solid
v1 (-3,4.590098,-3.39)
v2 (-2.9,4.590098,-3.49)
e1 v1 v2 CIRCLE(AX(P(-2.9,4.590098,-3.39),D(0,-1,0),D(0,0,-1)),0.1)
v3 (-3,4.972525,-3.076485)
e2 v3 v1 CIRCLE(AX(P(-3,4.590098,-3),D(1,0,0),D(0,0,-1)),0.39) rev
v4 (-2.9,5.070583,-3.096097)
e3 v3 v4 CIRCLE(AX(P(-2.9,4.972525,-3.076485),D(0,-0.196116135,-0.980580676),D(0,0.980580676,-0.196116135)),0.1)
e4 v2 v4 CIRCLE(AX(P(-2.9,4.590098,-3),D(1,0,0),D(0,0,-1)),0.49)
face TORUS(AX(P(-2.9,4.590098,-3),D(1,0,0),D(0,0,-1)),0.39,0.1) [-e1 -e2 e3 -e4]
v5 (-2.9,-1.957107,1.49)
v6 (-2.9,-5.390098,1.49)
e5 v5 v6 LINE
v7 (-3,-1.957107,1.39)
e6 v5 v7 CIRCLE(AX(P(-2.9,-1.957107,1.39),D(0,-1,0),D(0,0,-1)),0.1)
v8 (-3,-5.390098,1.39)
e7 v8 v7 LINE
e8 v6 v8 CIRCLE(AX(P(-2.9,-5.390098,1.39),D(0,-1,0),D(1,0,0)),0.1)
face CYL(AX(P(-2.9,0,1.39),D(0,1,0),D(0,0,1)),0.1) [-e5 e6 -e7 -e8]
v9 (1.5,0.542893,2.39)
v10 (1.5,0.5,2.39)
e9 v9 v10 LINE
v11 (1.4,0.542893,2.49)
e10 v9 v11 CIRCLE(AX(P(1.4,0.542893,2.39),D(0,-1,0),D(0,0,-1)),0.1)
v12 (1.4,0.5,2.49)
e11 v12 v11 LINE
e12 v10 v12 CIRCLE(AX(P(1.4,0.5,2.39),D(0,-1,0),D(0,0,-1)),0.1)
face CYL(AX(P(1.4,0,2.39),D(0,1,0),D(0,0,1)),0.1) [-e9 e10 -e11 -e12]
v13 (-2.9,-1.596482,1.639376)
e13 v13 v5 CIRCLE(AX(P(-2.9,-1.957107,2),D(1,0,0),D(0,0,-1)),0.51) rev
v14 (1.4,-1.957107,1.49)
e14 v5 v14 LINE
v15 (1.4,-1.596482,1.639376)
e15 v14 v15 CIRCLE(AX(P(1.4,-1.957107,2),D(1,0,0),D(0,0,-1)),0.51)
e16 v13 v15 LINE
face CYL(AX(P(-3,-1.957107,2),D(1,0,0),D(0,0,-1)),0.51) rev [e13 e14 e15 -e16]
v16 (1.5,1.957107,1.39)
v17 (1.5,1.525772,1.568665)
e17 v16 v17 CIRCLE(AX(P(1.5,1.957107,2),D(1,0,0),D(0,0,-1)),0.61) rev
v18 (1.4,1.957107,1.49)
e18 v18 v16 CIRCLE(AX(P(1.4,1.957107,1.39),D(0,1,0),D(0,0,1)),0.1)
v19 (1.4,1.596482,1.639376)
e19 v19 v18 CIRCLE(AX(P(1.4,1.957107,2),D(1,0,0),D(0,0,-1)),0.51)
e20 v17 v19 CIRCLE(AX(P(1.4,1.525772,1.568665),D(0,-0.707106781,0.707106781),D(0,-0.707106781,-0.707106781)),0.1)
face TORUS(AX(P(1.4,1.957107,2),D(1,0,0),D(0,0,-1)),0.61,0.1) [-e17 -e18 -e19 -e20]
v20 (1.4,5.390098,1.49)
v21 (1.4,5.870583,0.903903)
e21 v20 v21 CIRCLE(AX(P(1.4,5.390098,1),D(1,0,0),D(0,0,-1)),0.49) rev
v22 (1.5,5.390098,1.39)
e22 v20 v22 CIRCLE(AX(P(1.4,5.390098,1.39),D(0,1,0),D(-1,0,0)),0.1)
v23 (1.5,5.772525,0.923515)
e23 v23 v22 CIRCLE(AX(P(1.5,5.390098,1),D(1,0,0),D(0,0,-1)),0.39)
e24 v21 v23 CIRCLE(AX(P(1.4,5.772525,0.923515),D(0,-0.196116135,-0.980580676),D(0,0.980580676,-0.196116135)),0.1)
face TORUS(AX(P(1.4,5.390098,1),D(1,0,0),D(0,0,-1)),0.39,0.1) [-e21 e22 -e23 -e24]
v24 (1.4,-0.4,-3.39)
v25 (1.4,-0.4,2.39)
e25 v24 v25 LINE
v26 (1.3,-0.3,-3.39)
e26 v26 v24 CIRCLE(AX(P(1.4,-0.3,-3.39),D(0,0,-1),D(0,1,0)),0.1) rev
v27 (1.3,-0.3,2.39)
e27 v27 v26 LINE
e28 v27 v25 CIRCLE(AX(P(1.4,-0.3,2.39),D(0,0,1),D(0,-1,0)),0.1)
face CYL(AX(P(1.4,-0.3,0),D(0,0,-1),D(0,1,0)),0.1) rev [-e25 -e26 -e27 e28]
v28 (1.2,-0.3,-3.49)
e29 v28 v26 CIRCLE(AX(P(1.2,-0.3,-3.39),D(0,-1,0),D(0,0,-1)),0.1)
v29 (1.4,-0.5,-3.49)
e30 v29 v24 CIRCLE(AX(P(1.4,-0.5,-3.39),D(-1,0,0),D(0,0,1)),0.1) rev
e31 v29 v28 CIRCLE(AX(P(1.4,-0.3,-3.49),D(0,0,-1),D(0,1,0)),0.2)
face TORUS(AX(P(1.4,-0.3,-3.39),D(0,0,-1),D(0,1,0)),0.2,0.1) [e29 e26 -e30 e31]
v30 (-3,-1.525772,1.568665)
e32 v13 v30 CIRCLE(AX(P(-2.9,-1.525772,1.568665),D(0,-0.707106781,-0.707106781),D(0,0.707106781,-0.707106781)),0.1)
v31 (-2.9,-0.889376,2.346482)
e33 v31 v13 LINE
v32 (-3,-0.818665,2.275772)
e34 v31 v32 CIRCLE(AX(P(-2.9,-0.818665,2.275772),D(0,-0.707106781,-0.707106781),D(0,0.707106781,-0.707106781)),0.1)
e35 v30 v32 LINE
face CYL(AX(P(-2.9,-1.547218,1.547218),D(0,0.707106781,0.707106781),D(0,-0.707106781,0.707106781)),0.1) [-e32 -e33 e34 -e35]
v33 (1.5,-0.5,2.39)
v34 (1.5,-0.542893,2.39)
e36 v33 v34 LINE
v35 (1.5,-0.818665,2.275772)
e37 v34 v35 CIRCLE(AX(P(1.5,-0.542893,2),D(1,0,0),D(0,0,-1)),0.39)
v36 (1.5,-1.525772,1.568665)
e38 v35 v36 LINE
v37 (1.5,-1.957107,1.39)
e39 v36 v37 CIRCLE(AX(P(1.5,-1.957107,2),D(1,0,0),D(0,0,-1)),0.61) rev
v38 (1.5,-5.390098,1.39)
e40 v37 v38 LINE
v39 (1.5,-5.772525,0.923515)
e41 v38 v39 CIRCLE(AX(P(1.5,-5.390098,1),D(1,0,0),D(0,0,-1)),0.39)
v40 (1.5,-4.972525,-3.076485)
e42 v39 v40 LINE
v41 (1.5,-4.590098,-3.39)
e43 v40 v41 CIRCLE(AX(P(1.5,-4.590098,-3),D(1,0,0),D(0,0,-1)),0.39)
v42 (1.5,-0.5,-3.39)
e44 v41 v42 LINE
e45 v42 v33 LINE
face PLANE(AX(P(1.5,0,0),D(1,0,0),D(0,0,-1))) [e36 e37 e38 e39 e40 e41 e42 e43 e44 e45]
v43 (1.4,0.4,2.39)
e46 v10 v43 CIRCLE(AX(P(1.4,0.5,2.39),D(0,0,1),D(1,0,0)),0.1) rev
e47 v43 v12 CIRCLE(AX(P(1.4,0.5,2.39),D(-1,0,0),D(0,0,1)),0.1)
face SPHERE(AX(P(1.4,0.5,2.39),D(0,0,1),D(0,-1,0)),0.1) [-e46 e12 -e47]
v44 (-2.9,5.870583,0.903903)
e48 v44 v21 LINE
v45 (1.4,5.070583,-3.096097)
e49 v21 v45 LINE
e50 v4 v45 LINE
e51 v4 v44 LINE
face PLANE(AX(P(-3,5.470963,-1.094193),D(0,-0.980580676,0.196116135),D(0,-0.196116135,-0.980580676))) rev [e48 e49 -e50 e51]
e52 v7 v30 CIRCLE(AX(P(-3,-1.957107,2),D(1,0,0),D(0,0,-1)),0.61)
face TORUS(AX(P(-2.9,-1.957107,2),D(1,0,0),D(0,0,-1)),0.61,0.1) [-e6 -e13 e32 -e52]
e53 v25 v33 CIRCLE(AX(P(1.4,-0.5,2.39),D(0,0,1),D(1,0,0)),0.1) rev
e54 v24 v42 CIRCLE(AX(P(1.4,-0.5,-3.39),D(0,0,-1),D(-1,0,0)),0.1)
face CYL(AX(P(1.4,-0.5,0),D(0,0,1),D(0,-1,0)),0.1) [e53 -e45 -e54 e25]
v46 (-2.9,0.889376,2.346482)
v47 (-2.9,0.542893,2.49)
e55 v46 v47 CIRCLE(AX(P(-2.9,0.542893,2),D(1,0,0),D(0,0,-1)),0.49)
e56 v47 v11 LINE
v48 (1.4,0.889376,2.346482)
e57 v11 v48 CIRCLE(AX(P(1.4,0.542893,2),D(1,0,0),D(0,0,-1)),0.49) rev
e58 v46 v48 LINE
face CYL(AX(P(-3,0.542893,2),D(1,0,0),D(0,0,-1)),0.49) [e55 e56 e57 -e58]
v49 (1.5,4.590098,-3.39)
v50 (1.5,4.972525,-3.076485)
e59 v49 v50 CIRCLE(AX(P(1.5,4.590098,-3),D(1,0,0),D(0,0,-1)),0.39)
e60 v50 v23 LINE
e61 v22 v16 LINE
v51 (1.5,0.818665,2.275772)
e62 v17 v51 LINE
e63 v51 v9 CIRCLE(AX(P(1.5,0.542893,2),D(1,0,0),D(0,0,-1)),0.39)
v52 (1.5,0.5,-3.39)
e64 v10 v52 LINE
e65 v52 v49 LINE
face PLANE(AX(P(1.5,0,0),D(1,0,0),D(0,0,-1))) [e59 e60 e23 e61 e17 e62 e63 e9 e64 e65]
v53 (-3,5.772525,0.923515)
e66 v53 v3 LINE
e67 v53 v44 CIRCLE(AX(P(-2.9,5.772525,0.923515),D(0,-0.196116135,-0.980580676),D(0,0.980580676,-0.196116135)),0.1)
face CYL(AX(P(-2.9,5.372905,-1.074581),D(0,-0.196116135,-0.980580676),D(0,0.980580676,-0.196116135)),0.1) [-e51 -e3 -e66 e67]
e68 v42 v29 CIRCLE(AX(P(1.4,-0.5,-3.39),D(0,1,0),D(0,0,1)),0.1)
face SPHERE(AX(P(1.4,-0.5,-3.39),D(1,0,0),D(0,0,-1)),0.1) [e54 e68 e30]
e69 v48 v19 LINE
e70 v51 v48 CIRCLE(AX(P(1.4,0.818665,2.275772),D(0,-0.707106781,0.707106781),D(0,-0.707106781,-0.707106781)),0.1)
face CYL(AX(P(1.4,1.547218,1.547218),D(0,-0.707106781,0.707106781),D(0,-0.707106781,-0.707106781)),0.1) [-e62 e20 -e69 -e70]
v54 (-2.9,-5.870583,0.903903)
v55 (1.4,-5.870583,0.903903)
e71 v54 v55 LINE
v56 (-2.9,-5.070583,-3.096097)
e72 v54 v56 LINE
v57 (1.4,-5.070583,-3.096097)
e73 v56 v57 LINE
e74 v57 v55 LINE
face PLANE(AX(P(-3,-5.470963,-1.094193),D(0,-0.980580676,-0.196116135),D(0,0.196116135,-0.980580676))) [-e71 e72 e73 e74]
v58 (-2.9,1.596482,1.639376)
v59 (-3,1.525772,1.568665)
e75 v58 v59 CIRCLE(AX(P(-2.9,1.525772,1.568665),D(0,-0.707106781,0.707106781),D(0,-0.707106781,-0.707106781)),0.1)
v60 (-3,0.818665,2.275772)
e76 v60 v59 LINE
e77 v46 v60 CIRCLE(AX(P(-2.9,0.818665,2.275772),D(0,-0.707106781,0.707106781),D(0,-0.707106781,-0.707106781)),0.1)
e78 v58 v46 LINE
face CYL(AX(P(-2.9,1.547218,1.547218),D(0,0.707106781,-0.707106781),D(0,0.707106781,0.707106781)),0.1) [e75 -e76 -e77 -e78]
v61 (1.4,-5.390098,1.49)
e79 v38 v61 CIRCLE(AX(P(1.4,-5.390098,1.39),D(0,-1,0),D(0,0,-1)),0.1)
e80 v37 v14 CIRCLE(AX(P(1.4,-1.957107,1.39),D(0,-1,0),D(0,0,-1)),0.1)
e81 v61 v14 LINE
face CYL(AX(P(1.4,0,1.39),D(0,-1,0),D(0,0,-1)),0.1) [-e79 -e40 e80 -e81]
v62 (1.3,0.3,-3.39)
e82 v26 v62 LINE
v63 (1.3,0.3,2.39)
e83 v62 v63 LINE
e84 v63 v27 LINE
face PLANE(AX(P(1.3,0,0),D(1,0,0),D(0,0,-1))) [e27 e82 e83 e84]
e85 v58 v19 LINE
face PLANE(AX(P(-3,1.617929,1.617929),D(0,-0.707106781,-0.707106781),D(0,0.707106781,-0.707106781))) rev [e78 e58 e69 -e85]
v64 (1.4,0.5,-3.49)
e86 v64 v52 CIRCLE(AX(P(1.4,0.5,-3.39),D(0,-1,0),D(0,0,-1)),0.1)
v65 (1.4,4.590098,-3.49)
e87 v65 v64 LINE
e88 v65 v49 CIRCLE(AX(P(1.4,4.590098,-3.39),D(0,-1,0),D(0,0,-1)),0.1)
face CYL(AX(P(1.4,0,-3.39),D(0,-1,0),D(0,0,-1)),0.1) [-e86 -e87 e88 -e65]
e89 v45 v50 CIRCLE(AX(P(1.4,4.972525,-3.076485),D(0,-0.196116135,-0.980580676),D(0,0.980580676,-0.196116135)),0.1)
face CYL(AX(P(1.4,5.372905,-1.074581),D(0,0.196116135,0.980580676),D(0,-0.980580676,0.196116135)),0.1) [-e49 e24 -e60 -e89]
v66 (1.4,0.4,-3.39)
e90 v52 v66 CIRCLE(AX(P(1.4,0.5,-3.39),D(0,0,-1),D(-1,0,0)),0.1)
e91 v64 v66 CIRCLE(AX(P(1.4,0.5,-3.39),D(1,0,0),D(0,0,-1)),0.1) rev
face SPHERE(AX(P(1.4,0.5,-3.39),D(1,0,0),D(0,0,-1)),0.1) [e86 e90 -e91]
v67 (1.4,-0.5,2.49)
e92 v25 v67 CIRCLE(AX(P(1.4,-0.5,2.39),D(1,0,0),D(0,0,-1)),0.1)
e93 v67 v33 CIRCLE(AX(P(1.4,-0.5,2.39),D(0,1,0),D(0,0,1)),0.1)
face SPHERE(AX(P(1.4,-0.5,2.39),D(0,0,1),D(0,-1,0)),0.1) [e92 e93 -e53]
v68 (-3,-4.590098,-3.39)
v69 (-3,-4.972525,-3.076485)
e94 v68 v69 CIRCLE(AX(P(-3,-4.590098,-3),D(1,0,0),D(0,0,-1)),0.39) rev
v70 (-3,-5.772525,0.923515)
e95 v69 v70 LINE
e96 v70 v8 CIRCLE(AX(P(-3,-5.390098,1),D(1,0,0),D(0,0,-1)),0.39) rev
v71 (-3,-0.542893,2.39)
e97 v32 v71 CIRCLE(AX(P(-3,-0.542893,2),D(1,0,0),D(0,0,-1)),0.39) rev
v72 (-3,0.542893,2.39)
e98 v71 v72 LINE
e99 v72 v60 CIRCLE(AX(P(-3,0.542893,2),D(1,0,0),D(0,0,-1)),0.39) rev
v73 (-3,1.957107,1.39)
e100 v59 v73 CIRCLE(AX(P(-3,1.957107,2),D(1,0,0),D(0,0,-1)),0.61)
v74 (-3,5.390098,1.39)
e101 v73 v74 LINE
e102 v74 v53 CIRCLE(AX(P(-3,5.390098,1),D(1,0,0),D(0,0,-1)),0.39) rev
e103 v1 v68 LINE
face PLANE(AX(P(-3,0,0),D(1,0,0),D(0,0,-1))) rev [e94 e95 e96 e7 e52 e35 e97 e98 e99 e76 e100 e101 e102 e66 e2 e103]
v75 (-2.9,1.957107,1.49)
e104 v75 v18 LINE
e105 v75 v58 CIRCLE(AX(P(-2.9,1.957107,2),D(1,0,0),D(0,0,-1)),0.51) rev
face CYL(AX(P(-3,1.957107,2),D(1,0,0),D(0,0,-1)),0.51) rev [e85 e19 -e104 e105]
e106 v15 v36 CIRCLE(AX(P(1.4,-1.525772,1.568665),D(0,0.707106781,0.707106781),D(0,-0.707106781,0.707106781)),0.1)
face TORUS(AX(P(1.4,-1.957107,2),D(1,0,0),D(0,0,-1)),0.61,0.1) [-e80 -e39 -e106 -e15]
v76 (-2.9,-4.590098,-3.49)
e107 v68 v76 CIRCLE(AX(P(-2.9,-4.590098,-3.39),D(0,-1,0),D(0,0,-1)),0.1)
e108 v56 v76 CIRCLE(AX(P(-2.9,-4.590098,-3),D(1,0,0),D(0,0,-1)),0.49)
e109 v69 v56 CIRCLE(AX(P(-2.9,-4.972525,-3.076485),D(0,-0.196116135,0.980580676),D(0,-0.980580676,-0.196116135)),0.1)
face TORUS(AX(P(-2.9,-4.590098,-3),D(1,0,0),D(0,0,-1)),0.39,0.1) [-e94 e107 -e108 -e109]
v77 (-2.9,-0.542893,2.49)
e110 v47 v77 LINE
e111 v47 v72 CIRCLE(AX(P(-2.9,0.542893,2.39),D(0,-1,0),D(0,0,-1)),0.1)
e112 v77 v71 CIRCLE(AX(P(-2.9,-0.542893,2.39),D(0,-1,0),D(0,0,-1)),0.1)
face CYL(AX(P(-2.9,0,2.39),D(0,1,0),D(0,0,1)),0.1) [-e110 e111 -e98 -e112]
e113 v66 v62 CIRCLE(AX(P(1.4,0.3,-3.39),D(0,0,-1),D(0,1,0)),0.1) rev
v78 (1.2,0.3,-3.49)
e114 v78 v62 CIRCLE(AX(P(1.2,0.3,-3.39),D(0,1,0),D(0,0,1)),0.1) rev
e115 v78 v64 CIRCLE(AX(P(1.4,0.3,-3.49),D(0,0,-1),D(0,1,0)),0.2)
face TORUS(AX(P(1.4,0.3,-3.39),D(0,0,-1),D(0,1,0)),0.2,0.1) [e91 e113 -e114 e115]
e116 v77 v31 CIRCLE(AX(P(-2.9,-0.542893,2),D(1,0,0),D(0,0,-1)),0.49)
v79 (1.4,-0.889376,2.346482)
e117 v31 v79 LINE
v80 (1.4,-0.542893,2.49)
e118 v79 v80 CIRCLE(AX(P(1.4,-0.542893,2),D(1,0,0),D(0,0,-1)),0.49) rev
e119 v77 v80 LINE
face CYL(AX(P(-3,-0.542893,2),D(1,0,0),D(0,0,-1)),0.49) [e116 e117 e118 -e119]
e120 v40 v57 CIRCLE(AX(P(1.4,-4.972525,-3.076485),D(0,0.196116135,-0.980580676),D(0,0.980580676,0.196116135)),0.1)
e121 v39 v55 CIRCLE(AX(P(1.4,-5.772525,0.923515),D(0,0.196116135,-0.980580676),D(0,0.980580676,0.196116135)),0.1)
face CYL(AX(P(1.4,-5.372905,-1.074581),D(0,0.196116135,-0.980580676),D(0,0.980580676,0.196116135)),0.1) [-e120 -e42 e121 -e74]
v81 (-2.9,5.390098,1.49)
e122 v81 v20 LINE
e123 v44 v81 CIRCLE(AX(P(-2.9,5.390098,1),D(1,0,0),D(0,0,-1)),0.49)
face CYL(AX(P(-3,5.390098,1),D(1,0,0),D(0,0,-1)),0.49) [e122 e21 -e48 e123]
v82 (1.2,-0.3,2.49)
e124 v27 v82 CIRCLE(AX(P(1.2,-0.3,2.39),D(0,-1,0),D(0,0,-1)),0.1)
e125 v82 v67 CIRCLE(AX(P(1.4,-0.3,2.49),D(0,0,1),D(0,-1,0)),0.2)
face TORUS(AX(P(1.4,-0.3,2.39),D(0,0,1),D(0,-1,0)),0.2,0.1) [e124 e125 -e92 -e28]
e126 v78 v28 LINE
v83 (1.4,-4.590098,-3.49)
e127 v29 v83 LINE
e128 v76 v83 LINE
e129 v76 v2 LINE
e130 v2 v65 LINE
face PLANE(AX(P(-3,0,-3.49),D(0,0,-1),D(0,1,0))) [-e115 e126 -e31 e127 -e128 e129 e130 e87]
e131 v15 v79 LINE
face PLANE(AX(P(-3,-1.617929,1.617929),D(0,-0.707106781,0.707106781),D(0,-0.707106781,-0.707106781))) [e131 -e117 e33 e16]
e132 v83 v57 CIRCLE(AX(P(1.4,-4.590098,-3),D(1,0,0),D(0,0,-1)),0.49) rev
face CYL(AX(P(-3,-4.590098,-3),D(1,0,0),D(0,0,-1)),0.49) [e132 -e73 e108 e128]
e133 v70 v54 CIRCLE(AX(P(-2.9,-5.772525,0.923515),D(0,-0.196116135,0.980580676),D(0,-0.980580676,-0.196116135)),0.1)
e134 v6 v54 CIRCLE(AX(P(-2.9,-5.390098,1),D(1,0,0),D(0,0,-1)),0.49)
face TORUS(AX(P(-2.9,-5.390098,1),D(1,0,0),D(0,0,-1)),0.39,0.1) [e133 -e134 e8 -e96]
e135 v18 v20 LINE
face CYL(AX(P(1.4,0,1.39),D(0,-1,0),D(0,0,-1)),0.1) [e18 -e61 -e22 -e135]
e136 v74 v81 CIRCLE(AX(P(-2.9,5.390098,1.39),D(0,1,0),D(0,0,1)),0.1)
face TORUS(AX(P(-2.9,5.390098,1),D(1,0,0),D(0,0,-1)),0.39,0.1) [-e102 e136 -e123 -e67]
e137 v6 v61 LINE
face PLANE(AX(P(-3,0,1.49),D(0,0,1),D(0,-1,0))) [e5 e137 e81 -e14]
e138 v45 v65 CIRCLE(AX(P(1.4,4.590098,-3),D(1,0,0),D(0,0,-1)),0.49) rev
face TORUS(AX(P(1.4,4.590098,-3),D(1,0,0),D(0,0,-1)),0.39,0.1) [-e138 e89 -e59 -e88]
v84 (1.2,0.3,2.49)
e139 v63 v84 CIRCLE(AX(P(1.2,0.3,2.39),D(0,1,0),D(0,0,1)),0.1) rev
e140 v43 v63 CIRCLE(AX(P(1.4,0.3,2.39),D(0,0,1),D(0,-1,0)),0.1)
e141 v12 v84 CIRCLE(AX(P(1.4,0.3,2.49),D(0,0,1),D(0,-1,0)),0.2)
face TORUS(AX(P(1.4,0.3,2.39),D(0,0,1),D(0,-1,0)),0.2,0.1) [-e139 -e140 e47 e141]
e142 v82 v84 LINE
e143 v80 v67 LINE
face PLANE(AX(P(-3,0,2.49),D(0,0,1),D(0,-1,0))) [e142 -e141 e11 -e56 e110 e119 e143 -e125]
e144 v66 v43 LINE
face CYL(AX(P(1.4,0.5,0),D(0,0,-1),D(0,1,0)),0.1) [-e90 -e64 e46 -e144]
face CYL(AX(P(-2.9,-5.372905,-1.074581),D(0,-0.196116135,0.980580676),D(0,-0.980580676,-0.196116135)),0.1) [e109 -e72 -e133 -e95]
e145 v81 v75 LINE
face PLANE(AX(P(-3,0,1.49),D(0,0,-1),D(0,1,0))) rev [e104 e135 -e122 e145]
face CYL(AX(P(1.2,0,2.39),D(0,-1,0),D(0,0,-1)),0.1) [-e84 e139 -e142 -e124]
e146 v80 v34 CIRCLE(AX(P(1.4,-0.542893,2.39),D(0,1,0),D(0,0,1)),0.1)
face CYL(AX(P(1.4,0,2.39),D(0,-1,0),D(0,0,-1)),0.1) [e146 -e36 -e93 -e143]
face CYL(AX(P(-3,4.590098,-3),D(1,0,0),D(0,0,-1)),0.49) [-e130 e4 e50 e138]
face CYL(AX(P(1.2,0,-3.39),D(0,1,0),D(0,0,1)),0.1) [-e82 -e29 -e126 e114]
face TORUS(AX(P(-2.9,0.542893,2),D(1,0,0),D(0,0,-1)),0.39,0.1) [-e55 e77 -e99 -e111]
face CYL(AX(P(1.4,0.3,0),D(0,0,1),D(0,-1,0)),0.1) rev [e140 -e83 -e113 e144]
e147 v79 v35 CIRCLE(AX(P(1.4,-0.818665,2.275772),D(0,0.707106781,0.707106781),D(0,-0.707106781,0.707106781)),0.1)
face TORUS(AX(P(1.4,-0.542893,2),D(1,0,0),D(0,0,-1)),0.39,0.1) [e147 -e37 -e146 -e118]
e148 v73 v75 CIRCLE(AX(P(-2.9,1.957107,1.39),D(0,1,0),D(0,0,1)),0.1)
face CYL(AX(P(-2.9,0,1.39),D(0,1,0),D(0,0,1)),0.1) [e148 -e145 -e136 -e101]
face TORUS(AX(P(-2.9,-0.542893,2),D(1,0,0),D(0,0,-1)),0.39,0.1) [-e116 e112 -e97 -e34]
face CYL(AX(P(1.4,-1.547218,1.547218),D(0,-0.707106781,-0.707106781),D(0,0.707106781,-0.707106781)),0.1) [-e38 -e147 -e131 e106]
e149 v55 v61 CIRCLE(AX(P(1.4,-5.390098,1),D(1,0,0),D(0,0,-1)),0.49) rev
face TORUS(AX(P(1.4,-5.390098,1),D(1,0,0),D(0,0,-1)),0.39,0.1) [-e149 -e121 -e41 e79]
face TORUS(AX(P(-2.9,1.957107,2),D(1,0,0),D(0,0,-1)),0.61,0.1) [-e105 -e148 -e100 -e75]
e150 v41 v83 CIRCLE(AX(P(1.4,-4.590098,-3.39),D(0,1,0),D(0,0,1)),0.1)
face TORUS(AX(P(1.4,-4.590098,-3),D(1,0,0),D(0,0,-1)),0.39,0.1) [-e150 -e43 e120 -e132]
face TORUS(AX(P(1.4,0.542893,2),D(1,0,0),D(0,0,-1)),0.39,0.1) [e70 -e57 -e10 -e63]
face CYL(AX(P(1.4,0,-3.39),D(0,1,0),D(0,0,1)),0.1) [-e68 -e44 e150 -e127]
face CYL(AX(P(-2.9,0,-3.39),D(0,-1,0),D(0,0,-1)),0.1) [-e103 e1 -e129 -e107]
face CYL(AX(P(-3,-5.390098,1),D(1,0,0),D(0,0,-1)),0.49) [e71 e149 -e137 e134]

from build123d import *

# Parameters (mm, degrees)
BOSS_EXTRUDE2_START      = -3
BOSS_EXTRUDE2_DEPTH      = 4.5
BOSS_EXTRUDE3_DEPTH      = 1.3
BOSS_EXTRUDE3_DEPTH_BACK = 3
SKETCH2_3_W              = 0.8
SKETCH2_3_H              = 5.98
FILLET1_R                = 0.1


with BuildPart() as part:
    # Sketch2 → Boss-Extrude2 (new body)
    with BuildSketch(Plane.YZ.offset(BOSS_EXTRUDE2_START)):
        with BuildLine():
            Line((-0.4, -3.49), (-0.4, 2.49))
            Line((-0.4, 2.49), (-0.542893219, 2.49))
            ThreePointArc((-0.542893219, 2.49), (-0.730408101, 2.452700971), (-0.889375542, 2.346482323))
            Line((-0.889375542, 2.346482323), (-1.596482323, 1.639375542))
            ThreePointArc((-1.596482323, 1.639375542), (-1.761938231, 1.528821438), (-1.957106781, 1.49))
            Line((-1.957106781, 1.49), (-5.390098049, 1.49))
            ThreePointArc((-5.390098049, 1.49), (-5.769035698, 1.310654564), (-5.87058258, 0.903903094))
            Line((-5.87058258, 0.903903094), (-5.07058258, -3.096096906))
            ThreePointArc((-5.07058258, -3.096096906), (-4.900752612, -3.378937649), (-4.590098049, -3.49))
            Line((-4.590098049, -3.49), (-0.4, -3.49))
        make_face()
    boss_extrude2 = extrude(amount=BOSS_EXTRUDE2_DEPTH)

    # Sketch2<3> → Boss-Extrude3 (add, two sides: drawn at the far end of the back side and taken through both)
    with BuildSketch(Plane.YZ.offset(-BOSS_EXTRUDE3_DEPTH_BACK)):
        with Locations((0, -0.5)):
            Rectangle(SKETCH2_3_W, SKETCH2_3_H)
    extrude(amount=BOSS_EXTRUDE3_DEPTH + BOSS_EXTRUDE3_DEPTH_BACK)

    # Mirror1: Boss-Extrude2 across plane
    add(boss_extrude2.mirror(Plane.ZX))

    # Fillet1
    fillet1_edges = [part.edges().sort_by_distance(p)[0] for p in [
        (1.3, -0.4, -0.5),
        (1.3, 0.4, -0.5),
    ]]
    fillet(fillet1_edges, radius=FILLET1_R)
    fillet1_2_edges = [part.edges().sort_by_distance(p)[0] for p in [
        (1.3, 0, -3.49),
        (1.3, 0, 2.49),
        (1.5, 5.769035698, 1.310654564),
        (1.5, 5.47058258, -1.096096906),
        (1.5, 4.900752612, -3.378937649),
        (1.5, 2.495049024, -3.49),
        (1.5, 0.4, -0.5),
        (1.5, 0.471446609, 2.49),
        (1.5, 0.730408101, 2.452700971),
        (1.5, 1.242928932, 1.992928932),
        (1.5, 1.761938231, 1.528821438),
        (1.5, 3.673602415, 1.49),
        (1.5, -1.761938231, 1.528821438),
        (1.5, -1.242928932, 1.992928932),
        (1.5, -0.730408101, 2.452700971),
        (1.5, -0.471446609, 2.49),
        (1.5, -0.4, -0.5),
        (1.5, -2.495049024, -3.49),
        (1.5, -4.900752612, -3.378937649),
        (1.5, -5.47058258, -1.096096906),
        (1.5, -5.769035698, 1.310654564),
        (1.5, -3.673602415, 1.49),
        (-3, -5.769035698, 1.310654564),
        (-3, -5.47058258, -1.096096906),
        (-3, -4.900752612, -3.378937649),
        (-3, 0, -3.49),
        (-3, 4.900752612, -3.378937649),
        (-3, 5.47058258, -1.096096906),
        (-3, 5.769035698, 1.310654564),
        (-3, 3.673602415, 1.49),
        (-3, 1.761938231, 1.528821438),
        (-3, 1.242928932, 1.992928932),
        (-3, 0.730408101, 2.452700971),
        (-3, 0, 2.49),
        (-3, -0.730408101, 2.452700971),
        (-3, -1.242928932, 1.992928932),
        (-3, -1.761938231, 1.528821438),
        (-3, -3.673602415, 1.49),
        (1.329289322, 0.370710678, 2.49),
        (1.329289322, -0.370710678, 2.49),
        (1.329289322, -0.370710678, -3.49),
        (1.329289322, 0.370710678, -3.49),
    ]]
    fillet(fillet1_2_edges, radius=FILLET1_R - 0.0001)  # a hair under: the kernel refuses the full size


solid = part.part
